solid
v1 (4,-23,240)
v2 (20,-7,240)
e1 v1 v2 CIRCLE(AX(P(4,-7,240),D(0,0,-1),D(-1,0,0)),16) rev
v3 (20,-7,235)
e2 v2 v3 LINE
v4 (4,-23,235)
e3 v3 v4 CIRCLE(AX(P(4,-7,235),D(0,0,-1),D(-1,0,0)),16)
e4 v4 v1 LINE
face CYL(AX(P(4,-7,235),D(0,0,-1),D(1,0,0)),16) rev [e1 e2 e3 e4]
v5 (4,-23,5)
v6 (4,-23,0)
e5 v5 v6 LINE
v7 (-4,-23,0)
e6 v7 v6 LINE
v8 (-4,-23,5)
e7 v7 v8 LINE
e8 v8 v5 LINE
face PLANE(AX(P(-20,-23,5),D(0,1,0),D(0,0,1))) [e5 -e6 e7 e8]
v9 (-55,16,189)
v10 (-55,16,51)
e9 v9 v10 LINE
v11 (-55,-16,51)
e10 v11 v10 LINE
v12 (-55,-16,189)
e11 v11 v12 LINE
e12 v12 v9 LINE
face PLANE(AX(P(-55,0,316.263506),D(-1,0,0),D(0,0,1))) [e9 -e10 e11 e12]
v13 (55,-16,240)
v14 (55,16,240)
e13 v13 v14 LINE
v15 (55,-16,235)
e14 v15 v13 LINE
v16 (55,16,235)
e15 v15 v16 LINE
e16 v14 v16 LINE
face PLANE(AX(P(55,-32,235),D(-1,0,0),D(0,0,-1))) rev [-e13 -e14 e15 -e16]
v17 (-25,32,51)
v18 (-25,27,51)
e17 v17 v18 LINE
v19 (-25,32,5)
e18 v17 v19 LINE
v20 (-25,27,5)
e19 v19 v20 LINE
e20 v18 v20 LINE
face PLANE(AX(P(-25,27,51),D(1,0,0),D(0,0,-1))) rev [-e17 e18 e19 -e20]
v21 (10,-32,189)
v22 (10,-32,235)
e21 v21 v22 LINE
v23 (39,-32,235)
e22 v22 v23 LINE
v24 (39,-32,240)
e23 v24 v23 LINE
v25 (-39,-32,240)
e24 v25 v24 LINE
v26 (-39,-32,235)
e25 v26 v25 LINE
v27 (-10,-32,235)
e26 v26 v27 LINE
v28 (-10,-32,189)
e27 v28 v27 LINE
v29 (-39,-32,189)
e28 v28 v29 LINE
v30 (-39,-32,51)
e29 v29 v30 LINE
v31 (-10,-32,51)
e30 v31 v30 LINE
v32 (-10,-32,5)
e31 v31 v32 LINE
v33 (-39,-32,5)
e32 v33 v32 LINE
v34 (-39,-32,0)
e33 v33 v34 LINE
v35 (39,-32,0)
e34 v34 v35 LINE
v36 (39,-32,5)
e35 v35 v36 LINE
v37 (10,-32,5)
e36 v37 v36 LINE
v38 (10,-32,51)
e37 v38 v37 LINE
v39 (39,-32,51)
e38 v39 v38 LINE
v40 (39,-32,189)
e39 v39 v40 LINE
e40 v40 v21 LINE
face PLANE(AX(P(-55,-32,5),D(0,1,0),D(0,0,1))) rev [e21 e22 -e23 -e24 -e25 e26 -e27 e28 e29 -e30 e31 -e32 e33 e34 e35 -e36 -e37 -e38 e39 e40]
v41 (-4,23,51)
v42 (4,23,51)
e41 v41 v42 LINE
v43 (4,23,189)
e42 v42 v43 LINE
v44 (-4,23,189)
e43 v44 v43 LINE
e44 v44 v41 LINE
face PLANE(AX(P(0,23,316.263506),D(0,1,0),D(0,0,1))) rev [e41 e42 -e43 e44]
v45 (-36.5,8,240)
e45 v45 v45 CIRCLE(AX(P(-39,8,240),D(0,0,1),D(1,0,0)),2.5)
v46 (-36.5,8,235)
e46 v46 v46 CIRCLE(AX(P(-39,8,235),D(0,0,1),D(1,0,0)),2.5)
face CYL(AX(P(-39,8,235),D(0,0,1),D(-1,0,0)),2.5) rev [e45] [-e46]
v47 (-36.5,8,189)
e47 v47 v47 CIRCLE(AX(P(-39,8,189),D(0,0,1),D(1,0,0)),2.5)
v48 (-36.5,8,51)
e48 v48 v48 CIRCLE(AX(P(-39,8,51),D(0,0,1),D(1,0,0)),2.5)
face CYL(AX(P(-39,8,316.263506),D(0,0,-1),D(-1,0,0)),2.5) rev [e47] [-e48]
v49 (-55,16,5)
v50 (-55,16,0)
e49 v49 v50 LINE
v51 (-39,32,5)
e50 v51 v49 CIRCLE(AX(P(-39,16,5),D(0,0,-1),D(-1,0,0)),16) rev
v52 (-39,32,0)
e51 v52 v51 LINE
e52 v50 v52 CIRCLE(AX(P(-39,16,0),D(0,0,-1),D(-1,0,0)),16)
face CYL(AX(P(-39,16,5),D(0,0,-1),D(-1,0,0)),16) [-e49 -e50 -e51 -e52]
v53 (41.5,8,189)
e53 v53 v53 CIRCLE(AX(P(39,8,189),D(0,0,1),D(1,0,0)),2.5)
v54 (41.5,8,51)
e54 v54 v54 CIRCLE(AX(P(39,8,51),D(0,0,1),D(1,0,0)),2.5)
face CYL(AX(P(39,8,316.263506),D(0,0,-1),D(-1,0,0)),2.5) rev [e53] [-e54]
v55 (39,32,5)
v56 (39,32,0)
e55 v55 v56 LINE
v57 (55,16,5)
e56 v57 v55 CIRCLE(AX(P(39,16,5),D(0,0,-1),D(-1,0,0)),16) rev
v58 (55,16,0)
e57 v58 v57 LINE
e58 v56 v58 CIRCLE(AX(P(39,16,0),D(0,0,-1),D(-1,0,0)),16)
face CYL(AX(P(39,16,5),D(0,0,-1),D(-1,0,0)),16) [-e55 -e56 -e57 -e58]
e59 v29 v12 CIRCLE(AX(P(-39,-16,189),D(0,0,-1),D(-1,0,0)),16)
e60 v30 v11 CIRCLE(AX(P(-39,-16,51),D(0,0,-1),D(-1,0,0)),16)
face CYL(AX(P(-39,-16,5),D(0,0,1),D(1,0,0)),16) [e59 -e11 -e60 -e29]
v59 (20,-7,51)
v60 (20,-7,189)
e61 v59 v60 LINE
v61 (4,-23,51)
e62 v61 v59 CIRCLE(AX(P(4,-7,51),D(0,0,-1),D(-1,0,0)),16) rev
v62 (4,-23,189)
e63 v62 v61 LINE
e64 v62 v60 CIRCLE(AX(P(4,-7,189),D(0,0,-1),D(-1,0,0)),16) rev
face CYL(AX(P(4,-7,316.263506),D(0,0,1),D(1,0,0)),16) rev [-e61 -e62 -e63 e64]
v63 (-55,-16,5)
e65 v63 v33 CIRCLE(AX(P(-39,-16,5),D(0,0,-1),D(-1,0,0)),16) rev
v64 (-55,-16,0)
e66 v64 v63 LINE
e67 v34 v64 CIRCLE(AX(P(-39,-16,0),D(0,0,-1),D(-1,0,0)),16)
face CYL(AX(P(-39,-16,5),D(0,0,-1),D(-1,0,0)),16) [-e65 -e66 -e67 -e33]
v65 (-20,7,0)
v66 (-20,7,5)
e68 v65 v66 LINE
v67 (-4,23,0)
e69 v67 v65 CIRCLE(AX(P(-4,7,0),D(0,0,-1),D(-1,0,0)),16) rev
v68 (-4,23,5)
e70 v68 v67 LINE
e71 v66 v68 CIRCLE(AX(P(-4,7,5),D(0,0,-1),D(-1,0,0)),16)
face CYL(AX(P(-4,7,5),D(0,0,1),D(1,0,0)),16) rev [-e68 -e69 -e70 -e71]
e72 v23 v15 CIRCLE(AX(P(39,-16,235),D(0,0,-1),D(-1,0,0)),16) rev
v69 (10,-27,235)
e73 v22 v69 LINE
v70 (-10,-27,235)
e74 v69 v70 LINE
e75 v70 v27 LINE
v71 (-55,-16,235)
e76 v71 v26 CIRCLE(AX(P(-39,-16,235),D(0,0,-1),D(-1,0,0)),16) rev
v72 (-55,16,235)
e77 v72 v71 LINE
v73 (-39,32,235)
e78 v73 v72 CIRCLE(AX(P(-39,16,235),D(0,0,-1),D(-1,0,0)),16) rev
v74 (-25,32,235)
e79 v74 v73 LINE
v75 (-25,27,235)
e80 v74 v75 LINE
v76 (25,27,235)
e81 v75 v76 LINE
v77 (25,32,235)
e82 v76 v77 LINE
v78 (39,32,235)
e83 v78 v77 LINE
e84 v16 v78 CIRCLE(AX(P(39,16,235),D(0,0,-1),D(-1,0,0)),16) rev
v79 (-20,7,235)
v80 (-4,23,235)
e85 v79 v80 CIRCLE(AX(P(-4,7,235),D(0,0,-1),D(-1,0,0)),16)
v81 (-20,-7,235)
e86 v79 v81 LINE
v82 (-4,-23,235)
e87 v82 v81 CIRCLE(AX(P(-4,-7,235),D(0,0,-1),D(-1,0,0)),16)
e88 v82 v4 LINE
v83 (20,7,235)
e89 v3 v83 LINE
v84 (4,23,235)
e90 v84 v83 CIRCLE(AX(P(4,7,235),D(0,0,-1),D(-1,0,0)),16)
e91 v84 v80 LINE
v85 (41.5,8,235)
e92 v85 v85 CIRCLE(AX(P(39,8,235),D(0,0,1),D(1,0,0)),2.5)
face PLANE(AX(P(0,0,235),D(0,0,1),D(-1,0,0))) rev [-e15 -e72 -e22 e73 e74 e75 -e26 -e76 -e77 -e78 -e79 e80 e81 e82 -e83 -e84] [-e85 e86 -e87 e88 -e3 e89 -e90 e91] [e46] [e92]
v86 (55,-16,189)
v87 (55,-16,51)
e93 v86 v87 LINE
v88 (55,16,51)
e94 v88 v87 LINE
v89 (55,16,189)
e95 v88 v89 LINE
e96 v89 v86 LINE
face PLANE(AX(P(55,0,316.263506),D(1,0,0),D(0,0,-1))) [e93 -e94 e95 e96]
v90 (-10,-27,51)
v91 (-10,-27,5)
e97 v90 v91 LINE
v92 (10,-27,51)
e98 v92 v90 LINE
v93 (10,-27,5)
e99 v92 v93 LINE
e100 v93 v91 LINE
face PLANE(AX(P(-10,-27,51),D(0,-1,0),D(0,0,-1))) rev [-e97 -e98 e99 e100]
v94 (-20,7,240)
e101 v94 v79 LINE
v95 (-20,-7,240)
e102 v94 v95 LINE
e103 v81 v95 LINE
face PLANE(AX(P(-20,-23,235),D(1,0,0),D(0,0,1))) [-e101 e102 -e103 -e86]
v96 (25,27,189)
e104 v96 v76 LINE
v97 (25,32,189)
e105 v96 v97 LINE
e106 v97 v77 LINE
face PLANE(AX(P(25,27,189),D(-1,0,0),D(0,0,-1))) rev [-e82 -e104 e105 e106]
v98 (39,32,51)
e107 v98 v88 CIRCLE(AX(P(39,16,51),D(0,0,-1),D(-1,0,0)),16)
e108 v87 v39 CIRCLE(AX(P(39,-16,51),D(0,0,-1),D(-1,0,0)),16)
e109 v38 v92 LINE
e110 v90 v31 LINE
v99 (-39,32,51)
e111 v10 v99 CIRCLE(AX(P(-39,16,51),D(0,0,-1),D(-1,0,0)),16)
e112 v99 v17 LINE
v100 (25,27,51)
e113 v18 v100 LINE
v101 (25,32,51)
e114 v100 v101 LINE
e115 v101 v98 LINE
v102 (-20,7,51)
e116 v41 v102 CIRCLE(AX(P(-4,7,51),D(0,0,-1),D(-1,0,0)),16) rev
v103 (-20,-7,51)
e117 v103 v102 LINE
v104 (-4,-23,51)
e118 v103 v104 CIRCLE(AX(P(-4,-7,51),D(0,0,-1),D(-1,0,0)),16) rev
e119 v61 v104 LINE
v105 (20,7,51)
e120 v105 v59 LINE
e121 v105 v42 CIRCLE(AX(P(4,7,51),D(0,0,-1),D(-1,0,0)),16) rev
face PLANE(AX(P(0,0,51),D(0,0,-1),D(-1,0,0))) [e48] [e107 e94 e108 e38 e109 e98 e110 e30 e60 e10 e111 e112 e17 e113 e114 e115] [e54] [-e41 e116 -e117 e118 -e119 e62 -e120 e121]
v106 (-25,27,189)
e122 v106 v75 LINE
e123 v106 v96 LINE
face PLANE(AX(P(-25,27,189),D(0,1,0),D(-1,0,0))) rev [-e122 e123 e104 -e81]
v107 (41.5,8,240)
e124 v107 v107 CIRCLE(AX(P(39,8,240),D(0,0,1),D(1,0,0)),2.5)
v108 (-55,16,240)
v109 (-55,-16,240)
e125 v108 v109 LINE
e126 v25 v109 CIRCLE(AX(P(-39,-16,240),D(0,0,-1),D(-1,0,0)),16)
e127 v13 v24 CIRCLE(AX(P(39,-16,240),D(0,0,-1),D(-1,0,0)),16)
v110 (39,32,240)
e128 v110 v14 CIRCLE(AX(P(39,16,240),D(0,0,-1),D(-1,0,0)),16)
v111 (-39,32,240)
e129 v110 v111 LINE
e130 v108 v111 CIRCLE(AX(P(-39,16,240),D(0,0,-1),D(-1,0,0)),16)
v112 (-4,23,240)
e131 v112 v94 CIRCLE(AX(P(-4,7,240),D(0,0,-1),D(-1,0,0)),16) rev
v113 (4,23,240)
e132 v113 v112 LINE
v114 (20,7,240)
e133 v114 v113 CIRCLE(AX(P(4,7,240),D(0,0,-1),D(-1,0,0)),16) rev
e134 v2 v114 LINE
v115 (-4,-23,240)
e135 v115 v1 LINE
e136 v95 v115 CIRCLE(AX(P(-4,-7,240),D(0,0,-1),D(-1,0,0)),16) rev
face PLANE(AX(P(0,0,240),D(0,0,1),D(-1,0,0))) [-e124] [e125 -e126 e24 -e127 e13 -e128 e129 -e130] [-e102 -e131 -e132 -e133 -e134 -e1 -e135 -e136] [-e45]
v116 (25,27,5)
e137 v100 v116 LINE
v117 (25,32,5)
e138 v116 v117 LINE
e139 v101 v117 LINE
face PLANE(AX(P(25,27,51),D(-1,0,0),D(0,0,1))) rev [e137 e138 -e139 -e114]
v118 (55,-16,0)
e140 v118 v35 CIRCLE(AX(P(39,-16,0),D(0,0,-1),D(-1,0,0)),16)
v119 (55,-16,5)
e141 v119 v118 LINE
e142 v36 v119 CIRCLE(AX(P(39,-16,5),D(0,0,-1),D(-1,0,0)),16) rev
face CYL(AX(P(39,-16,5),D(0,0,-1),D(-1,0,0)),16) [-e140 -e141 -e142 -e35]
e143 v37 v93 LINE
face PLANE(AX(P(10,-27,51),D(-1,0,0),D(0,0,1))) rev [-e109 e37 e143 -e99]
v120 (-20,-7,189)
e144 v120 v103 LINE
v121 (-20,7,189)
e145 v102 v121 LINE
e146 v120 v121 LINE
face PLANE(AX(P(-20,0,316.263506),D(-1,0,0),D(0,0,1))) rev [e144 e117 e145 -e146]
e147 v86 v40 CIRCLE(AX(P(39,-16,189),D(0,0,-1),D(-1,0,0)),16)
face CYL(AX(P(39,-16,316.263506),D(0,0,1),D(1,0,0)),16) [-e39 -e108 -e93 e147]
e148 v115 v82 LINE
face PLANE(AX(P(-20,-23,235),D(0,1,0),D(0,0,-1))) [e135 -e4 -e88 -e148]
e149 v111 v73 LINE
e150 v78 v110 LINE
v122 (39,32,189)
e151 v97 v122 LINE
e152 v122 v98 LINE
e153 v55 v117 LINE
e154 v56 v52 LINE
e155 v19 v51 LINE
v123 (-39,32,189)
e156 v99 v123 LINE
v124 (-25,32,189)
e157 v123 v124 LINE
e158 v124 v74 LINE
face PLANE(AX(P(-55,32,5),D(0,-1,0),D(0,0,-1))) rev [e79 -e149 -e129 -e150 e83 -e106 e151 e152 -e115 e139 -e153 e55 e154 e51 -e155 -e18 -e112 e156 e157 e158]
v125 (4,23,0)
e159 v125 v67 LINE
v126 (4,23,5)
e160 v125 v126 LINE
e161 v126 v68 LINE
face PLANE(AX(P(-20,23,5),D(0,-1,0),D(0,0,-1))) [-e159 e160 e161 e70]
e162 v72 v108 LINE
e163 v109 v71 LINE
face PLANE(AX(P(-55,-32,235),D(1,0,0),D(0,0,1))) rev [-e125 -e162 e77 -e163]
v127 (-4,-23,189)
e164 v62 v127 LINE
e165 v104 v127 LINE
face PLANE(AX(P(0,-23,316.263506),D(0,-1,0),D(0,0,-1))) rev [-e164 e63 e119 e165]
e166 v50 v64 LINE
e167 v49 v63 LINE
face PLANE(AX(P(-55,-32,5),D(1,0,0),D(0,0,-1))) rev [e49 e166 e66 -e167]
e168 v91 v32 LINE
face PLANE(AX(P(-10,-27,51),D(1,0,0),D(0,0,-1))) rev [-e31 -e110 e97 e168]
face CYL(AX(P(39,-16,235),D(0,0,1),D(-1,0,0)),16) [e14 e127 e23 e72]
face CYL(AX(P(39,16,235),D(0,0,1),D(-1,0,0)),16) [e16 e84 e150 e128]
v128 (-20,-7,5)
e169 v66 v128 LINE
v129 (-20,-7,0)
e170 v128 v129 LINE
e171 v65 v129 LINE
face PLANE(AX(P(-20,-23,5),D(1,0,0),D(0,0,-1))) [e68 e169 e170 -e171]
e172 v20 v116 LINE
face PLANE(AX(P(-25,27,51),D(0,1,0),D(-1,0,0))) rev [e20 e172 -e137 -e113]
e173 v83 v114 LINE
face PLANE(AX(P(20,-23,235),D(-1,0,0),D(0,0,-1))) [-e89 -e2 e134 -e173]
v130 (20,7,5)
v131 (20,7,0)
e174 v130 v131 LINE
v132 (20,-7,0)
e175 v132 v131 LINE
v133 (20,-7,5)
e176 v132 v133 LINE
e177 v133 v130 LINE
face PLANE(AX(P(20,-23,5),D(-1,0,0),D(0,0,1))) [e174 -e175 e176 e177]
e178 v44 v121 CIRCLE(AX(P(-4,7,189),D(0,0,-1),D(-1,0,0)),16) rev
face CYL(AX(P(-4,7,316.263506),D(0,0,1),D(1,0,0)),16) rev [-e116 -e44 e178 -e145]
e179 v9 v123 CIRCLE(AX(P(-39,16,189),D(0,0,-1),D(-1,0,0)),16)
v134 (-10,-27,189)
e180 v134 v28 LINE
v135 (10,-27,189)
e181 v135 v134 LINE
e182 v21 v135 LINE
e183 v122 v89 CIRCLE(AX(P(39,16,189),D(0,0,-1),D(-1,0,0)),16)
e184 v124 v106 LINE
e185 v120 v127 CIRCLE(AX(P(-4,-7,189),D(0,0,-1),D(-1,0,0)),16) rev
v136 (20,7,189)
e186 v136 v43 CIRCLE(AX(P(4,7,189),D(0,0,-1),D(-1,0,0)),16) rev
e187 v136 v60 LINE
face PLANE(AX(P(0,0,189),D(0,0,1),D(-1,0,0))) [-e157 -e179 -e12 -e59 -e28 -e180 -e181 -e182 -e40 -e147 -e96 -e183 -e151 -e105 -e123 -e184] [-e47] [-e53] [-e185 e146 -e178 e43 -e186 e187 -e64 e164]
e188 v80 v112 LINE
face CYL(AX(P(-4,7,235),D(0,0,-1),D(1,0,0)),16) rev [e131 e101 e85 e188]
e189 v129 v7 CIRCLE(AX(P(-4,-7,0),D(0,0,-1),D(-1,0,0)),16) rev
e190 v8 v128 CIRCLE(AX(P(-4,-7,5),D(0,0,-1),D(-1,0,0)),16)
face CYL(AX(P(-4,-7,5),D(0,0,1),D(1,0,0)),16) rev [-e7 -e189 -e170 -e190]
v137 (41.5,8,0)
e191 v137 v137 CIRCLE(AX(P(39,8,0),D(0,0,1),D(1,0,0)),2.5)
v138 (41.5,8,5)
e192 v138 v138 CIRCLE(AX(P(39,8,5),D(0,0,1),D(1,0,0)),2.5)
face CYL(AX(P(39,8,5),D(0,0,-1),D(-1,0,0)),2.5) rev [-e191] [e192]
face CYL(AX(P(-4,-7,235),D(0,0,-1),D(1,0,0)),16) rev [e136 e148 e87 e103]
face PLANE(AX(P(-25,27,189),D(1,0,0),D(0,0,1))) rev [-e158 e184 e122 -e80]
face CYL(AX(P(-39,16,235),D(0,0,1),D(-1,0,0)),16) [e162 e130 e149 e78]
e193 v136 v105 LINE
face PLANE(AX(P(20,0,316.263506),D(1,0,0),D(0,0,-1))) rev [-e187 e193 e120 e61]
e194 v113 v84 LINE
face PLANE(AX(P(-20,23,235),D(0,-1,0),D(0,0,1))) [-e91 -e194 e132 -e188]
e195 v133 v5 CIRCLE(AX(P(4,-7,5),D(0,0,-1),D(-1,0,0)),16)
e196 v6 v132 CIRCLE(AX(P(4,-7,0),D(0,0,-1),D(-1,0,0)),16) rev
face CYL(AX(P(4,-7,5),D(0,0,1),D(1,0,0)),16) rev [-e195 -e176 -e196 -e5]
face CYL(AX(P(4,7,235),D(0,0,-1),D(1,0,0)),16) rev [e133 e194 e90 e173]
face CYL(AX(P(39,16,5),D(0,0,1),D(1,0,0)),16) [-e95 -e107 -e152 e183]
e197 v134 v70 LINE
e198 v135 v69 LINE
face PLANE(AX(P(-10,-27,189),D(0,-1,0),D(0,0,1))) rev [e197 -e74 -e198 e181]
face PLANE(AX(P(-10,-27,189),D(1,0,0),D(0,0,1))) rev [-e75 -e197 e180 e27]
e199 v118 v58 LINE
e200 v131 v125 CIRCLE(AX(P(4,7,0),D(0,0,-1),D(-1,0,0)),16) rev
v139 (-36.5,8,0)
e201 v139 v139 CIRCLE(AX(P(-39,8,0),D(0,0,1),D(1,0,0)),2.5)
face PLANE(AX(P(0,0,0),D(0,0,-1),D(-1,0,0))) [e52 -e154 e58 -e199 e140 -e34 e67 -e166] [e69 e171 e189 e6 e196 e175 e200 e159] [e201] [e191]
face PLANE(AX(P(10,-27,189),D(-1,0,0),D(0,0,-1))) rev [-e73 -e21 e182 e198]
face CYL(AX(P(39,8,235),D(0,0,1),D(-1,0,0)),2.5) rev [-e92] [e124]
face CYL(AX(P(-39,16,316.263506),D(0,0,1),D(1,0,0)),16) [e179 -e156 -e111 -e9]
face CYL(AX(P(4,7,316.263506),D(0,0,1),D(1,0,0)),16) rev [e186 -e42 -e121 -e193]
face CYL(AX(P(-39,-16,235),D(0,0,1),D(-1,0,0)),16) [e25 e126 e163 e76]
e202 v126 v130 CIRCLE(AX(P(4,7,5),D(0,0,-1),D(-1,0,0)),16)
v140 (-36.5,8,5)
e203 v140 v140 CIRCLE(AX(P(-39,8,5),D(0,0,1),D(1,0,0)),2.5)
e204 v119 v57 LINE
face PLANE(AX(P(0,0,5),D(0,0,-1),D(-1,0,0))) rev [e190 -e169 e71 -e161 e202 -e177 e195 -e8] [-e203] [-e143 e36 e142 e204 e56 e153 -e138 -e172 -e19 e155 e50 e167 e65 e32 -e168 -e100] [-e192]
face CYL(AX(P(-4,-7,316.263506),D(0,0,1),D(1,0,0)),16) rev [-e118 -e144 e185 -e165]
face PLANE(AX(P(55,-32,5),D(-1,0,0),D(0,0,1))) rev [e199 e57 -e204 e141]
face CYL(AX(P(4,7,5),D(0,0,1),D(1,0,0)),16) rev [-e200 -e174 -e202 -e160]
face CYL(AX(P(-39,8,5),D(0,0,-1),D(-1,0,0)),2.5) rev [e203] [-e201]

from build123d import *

# Parameters (mm, degrees)
SKETCH1_W             = 110
SKETCH1_H             = 64
SKETCH1_R             = 2.5
SKETCH1_W_2           = 40
SKETCH1_H_2           = 46
BOSS_EXTRUDE1_DEPTH   = 5
FILLET1_R             = 16
FILLET2_R             = 16
SKETCH2_W             = 50
SKETCH2_H             = 5
SKETCH2_W_2           = 20
BOSS_EXTRUDE2_DEPTH   = 46
BOSS_EXTRUDE3_START   = 51
SKETCH1_2_W           = 110
SKETCH1_2_H           = 64
SKETCH1_2_R           = 2.5
SKETCH1_2_W_2         = 40
SKETCH1_2_H_2         = 46
BOSS_EXTRUDE3_DEPTH   = 69
FILLET3_R             = 16
MIRROR2_START         = 120
MIRROR2_OUTLINE_R     = 2.5
MIRROR2_DEPTH         = 69
MIRROR2_START_2       = 235
MIRROR2_2_OUTLINE_R   = 2.5
MIRROR2_2_DEPTH       = 5
MIRROR2_START_3       = 189
MIRROR2_3_OUTLINE_W   = 20
MIRROR2_3_OUTLINE_H   = 5
MIRROR2_3_OUTLINE_W_2 = 50
MIRROR2_3_DEPTH       = 46


# Read off the part's stored shape, not the designer's step: Mirror2
with BuildPart() as part:
    # Sketch1 → Boss-Extrude1 (new body)
    with BuildSketch(Plane.XY):
        Rectangle(SKETCH1_W, SKETCH1_H)
        with Locations((39, 8)):
            Circle(SKETCH1_R, mode=Mode.SUBTRACT)
        with Locations((-39, 8)):
            Circle(SKETCH1_R, mode=Mode.SUBTRACT)
        Rectangle(SKETCH1_W_2, SKETCH1_H_2, mode=Mode.SUBTRACT)
    extrude(amount=BOSS_EXTRUDE1_DEPTH)

    # Fillet1
    fillet1_edges = [part.edges().sort_by_distance(p)[0] for p in [
        (55, -32, 2.5),
        (-55, -32, 2.5),
        (-55, 32, 2.5),
        (55, 32, 2.5),
    ]]
    fillet(fillet1_edges, radius=FILLET1_R)

    # Fillet2
    fillet2_edges = [part.edges().sort_by_distance(p)[0] for p in [
        (20, -23, 2.5),
        (20, 23, 2.5),
        (-20, 23, 2.5),
        (-20, -23, 2.5),
    ]]
    fillet(fillet2_edges, radius=FILLET2_R)

    # Sketch2 → Boss-Extrude2 (add)
    with BuildSketch(Plane.XY.offset(5)):
        with Locations((0, 29.5)):
            Rectangle(SKETCH2_W, SKETCH2_H)
        with Locations((0, -29.5)):
            Rectangle(SKETCH2_W_2, SKETCH2_H)
    extrude(amount=BOSS_EXTRUDE2_DEPTH)

    # Sketch1<2> → Boss-Extrude3 (add)
    with BuildSketch(Plane.XY.offset(BOSS_EXTRUDE3_START)):
        Rectangle(SKETCH1_2_W, SKETCH1_2_H)
        with Locations((39, 8)):
            Circle(SKETCH1_2_R, mode=Mode.SUBTRACT)
        with Locations((-39, 8)):
            Circle(SKETCH1_2_R, mode=Mode.SUBTRACT)
        Rectangle(SKETCH1_2_W_2, SKETCH1_2_H_2, mode=Mode.SUBTRACT)
    extrude(amount=BOSS_EXTRUDE3_DEPTH)

    # Fillet3
    fillet3_edges = [part.edges().sort_by_distance(p)[0] for p in [
        (55, 32, 85.5),
        (-55, 32, 85.5),
        (-55, -32, 85.5),
        (55, -32, 85.5),
        (-20, -23, 85.5),
        (20, -23, 85.5),
        (20, 23, 85.5),
        (-20, 23, 85.5),
    ]]
    fillet(fillet3_edges, radius=FILLET3_R)

    # Mirror2 outline → Mirror2 (add)
    with BuildSketch(Plane.XY.offset(MIRROR2_START)):
        with BuildLine():
            ThreePointArc((39, -32), (50.313708499, -27.313708499), (55, -16))
            Line((55, -16), (55, 16))
            ThreePointArc((55, 16), (50.313708499, 27.313708499), (39, 32))
            Line((39, 32), (-39, 32))
            ThreePointArc((-39, 32), (-50.313708499, 27.313708499), (-55, 16))
            Line((-55, 16), (-55, -16))
            ThreePointArc((-55, -16), (-50.313708499, -27.313708499), (-39, -32))
            Line((-39, -32), (39, -32))
        make_face()
        with Locations((-39, 8)):
            Circle(MIRROR2_OUTLINE_R, mode=Mode.SUBTRACT)
        with BuildLine():
            Line((20, 7), (20, -7))
            ThreePointArc((20, -7), (15.313708499, -18.313708499), (4, -23))
            Line((4, -23), (-4, -23))
            ThreePointArc((-4, -23), (-15.313708499, -18.313708499), (-20, -7))
            Line((-20, -7), (-20, 7))
            ThreePointArc((-20, 7), (-15.313708499, 18.313708499), (-4, 23))
            Line((-4, 23), (4, 23))
            ThreePointArc((4, 23), (15.313708499, 18.313708499), (20, 7))
        make_face(mode=Mode.SUBTRACT)
        with Locations((39, 8)):
            Circle(MIRROR2_OUTLINE_R, mode=Mode.SUBTRACT)
    extrude(amount=MIRROR2_DEPTH)



with BuildPart() as body_2:
    # Mirror2 2 outline → Mirror2 2 (new body)
    with BuildSketch(Plane.XY.offset(MIRROR2_START_2)):
        with BuildLine():
            ThreePointArc((39, -32), (50.313708499, -27.313708499), (55, -16))
            Line((55, -16), (55, 16))
            ThreePointArc((55, 16), (50.313708499, 27.313708499), (39, 32))
            Line((39, 32), (-39, 32))
            ThreePointArc((-39, 32), (-50.313708499, 27.313708499), (-55, 16))
            Line((-55, 16), (-55, -16))
            ThreePointArc((-55, -16), (-50.313708499, -27.313708499), (-39, -32))
            Line((-39, -32), (39, -32))
        make_face()
        with Locations((-39, 8)):
            Circle(MIRROR2_2_OUTLINE_R, mode=Mode.SUBTRACT)
        with BuildLine():
            Line((20, 7), (20, -7))
            ThreePointArc((20, -7), (15.313708499, -18.313708499), (4, -23))
            Line((4, -23), (-4, -23))
            ThreePointArc((-4, -23), (-15.313708499, -18.313708499), (-20, -7))
            Line((-20, -7), (-20, 7))
            ThreePointArc((-20, 7), (-15.313708499, 18.313708499), (-4, 23))
            Line((-4, 23), (4, 23))
            ThreePointArc((4, 23), (15.313708499, 18.313708499), (20, 7))
        make_face(mode=Mode.SUBTRACT)
        with Locations((39, 8)):
            Circle(MIRROR2_2_OUTLINE_R, mode=Mode.SUBTRACT)
    extrude(amount=MIRROR2_2_DEPTH)


with BuildPart() as part_1:
    add(part.part)

    add(body_2.part)  # Mirror2 3 merges body 2
    # Mirror2 3 outline → Mirror2 3 (add)
    with BuildSketch(Plane.XY.offset(MIRROR2_START_3)):
        with Locations((0, -29.5)):
            Rectangle(MIRROR2_3_OUTLINE_W, MIRROR2_3_OUTLINE_H)
        with Locations((0, 29.5)):
            Rectangle(MIRROR2_3_OUTLINE_W_2, MIRROR2_3_OUTLINE_H)
    extrude(amount=MIRROR2_3_DEPTH)


solid = part_1.part
